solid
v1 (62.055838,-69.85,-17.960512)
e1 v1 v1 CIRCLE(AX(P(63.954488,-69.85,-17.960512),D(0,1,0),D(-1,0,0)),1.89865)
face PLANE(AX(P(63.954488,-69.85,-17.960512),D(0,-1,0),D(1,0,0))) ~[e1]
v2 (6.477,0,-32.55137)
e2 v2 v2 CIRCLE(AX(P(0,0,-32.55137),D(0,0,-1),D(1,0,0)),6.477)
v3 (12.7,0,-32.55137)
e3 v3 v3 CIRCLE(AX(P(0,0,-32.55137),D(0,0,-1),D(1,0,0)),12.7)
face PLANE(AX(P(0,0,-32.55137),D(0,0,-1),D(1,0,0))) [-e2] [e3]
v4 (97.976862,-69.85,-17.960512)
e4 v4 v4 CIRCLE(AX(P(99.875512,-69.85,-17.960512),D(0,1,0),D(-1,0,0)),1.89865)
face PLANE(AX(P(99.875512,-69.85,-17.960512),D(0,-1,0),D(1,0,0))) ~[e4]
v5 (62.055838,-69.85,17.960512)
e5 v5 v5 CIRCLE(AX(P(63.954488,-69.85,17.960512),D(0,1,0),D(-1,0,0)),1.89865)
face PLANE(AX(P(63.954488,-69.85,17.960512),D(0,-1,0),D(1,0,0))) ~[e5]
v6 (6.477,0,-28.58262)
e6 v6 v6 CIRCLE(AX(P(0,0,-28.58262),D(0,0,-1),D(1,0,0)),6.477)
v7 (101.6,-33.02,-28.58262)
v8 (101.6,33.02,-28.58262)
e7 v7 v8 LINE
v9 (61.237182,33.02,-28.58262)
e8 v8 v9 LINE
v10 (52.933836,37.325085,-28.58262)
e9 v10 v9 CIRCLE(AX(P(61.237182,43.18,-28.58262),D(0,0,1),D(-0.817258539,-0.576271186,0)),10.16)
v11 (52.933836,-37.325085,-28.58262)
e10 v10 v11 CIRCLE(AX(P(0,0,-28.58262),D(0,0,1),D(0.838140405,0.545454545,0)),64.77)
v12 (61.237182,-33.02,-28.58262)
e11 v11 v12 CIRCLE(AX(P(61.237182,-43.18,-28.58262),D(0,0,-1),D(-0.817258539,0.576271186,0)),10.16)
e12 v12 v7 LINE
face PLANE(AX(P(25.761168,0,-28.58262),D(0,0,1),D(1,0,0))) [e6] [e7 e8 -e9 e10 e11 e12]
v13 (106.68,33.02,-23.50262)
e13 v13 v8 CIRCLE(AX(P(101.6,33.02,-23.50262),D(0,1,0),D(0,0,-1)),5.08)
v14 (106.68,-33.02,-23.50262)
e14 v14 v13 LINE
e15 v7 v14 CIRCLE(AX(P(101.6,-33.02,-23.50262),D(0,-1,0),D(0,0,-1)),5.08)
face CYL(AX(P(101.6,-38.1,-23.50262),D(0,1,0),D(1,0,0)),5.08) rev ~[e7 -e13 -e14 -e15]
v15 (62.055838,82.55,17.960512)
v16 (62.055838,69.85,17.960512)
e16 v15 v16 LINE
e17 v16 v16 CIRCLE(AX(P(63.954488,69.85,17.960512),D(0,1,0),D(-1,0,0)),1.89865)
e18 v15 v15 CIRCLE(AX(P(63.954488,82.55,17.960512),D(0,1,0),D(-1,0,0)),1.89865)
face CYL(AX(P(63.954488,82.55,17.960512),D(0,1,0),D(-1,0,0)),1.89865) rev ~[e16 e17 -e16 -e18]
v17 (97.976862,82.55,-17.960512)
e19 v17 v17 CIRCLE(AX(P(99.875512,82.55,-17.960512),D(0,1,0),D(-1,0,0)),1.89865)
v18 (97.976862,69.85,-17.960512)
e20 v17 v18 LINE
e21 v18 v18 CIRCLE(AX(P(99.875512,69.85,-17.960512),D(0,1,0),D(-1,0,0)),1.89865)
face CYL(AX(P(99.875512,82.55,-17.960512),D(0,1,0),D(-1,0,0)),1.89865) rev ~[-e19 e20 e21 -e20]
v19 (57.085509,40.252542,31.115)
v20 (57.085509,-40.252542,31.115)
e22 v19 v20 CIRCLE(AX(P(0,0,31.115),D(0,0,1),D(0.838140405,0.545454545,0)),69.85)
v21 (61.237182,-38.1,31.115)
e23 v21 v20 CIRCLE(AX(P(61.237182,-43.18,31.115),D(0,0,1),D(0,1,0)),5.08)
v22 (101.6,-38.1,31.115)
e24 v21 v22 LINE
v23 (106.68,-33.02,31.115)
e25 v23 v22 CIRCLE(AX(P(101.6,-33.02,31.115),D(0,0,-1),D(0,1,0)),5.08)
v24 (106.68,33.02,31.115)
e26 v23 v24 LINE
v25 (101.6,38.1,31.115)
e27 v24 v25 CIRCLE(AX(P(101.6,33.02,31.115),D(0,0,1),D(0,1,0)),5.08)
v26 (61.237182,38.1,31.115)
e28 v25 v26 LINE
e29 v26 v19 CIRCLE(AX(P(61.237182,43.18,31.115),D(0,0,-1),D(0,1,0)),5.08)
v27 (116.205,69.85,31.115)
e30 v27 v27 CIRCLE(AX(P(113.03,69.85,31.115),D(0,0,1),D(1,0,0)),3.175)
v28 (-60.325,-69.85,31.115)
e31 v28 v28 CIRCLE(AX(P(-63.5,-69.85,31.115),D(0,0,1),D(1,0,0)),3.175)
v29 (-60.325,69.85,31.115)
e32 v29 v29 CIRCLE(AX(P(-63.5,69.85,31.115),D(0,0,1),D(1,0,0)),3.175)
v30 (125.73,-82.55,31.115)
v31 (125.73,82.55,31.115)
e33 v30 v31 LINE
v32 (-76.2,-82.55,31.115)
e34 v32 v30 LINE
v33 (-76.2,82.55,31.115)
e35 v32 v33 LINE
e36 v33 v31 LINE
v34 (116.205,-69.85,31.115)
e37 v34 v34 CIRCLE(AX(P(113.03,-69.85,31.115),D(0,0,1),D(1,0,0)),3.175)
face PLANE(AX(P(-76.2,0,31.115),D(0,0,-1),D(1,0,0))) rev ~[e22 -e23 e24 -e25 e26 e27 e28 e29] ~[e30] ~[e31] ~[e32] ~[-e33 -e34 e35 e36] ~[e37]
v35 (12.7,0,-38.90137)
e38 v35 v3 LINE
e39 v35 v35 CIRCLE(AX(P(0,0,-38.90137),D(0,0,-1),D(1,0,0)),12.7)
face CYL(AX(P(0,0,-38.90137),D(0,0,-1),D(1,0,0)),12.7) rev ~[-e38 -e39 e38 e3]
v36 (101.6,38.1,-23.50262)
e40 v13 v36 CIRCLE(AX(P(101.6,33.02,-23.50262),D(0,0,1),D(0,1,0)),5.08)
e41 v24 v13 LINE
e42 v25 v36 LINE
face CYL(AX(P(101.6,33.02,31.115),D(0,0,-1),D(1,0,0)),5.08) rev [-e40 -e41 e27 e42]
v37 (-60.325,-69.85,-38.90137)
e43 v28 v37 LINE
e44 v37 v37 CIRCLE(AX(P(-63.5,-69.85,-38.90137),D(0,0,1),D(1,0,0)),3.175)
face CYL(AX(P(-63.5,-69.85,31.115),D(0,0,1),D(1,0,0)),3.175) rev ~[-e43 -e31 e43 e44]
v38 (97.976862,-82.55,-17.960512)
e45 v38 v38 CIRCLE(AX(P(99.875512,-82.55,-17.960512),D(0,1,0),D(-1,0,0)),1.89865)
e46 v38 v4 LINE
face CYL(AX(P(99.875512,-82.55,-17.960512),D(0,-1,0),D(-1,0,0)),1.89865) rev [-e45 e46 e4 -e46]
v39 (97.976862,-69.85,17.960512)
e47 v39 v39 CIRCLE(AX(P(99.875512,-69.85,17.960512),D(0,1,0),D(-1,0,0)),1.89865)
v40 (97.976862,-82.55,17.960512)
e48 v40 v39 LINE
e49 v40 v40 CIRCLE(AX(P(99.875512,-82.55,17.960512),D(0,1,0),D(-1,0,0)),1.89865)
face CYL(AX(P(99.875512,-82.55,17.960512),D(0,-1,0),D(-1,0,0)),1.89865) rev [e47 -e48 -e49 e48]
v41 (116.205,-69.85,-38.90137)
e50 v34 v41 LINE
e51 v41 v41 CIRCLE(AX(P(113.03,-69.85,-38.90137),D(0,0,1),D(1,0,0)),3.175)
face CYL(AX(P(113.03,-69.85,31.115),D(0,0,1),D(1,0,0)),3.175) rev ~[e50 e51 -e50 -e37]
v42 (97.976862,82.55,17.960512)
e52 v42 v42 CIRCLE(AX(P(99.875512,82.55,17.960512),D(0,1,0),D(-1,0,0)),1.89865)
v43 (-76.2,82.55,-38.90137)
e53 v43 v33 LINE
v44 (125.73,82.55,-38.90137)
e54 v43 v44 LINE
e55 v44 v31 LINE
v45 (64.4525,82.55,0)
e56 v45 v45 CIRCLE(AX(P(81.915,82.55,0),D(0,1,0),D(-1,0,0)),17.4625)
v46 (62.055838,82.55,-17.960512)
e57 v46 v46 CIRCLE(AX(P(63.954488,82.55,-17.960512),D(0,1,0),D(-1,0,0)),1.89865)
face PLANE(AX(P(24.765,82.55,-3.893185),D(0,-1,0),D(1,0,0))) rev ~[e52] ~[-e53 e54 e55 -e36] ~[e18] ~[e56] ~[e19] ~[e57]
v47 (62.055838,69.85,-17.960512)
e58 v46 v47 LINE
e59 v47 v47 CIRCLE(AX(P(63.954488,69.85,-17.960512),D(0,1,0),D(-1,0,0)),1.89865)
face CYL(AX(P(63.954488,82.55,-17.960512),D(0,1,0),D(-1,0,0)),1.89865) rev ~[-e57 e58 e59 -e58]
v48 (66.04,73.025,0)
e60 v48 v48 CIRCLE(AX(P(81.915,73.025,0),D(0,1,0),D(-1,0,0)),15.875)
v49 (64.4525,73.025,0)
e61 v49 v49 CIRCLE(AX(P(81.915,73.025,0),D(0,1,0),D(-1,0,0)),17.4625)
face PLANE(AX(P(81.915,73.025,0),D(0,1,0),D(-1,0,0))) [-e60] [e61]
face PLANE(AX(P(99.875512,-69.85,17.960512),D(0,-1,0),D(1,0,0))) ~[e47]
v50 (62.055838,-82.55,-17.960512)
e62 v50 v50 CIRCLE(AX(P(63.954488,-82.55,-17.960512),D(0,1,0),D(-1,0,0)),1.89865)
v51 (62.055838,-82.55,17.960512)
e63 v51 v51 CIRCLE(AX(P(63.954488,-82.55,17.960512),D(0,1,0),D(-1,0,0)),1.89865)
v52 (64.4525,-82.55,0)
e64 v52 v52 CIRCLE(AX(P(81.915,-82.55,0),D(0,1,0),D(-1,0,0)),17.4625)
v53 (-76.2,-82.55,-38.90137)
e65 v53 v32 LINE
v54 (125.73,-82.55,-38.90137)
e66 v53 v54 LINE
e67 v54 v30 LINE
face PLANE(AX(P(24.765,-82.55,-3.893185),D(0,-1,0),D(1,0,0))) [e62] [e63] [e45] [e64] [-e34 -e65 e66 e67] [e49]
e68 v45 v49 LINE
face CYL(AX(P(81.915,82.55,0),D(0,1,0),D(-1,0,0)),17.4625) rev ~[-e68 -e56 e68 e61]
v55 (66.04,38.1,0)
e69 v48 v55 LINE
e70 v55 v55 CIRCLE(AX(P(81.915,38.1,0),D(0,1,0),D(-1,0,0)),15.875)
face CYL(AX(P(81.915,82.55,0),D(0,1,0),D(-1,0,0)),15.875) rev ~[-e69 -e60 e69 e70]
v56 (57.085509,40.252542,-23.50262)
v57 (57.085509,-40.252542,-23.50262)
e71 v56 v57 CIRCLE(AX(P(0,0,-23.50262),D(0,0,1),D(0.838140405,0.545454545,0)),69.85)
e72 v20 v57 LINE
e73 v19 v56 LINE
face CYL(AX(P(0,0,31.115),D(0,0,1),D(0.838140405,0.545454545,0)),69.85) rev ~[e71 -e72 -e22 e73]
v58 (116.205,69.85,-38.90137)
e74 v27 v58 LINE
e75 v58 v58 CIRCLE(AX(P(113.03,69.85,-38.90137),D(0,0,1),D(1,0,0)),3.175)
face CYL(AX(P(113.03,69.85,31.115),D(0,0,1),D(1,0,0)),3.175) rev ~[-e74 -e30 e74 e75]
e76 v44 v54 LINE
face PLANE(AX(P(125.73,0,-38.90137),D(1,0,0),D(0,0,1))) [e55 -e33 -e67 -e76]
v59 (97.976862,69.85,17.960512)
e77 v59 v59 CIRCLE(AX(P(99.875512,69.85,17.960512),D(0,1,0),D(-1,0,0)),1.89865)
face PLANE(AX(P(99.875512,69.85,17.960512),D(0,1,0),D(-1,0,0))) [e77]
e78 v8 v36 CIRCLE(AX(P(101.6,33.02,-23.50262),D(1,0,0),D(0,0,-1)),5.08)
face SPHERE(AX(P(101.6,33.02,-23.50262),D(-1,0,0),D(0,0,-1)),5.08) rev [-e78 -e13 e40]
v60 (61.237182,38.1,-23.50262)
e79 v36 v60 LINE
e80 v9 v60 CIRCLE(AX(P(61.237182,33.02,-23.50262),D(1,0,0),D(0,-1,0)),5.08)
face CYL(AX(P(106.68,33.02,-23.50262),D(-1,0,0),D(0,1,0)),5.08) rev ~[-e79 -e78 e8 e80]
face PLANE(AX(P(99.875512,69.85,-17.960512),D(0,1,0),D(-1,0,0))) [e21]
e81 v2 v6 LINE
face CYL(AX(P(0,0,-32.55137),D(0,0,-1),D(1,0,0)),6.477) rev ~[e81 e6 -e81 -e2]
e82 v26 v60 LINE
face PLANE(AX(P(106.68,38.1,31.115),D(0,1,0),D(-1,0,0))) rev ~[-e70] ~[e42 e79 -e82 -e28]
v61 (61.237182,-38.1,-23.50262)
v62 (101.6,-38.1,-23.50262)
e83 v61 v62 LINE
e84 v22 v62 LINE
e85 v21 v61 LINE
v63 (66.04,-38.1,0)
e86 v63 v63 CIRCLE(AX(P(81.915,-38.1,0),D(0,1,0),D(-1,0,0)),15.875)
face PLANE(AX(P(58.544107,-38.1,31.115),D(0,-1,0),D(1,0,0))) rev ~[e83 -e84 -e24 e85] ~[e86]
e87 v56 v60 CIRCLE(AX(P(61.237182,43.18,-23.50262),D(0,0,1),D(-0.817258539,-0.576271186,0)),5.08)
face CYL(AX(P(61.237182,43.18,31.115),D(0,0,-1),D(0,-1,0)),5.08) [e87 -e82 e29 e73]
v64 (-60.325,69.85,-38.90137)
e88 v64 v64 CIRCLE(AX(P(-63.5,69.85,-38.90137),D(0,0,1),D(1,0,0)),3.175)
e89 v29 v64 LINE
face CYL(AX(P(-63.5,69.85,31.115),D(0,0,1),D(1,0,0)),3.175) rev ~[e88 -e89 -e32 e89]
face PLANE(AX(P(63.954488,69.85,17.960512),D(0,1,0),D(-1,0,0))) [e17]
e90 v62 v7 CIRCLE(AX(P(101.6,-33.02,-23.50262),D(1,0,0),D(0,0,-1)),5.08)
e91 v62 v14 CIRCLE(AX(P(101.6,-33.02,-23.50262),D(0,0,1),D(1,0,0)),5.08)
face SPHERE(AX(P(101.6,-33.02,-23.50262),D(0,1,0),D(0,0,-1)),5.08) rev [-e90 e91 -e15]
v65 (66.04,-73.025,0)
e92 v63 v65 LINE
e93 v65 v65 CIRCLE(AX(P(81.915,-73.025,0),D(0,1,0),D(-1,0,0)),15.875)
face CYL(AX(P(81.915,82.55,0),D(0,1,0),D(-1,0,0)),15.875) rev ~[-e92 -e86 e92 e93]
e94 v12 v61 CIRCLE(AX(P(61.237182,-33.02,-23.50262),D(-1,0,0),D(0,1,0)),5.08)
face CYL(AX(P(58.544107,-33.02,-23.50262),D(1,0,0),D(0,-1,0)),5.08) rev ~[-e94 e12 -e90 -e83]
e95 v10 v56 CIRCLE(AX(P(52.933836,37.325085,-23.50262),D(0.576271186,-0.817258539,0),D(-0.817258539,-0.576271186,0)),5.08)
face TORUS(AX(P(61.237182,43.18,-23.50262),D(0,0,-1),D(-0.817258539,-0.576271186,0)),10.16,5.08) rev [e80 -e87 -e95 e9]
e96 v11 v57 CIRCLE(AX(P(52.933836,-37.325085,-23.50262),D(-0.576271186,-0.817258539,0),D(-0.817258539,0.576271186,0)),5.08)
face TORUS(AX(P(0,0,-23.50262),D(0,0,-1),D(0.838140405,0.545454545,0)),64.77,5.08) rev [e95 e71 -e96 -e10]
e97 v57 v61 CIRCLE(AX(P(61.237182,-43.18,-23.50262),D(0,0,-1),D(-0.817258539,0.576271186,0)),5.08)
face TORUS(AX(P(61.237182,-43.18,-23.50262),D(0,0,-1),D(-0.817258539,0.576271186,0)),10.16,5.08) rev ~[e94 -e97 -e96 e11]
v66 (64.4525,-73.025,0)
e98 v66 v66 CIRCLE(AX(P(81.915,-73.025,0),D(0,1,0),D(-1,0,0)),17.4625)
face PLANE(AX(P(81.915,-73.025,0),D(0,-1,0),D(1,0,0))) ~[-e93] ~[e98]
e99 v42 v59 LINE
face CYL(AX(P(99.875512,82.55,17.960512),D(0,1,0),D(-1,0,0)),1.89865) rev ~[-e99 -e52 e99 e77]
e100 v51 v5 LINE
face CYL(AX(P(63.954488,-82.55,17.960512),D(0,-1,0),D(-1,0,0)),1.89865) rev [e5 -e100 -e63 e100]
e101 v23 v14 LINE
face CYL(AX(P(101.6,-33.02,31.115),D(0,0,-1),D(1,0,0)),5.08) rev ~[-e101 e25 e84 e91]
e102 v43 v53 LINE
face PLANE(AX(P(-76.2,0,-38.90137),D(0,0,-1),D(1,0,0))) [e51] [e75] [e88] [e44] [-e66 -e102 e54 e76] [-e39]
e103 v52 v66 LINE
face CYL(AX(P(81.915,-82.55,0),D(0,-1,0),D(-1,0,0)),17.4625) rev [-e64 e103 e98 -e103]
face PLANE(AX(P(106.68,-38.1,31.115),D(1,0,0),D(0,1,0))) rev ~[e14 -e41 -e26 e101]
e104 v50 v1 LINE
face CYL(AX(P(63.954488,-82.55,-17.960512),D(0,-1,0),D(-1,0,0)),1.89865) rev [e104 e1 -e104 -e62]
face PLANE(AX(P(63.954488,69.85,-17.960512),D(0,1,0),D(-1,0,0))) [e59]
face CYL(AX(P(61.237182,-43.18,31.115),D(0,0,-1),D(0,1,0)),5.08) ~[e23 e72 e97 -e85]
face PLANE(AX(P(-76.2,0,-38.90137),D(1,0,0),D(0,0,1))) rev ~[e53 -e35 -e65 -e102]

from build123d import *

# Parameters (mm, degrees)
F2_W      = 201.93
F2_H      = 70.01637
F3_DEPTH  = 82.55
F5_DEPTH  = 59.69762
F6_R      = 12.7
F7_DEPTH  = 6.35
F8_R      = 6.477
F9_DEPTH  = 25.4
F10_R     = 15.875
F11_DEPTH = 165.101
F12_R     = 3.175
F13_DEPTH = 70.01737
F15_R     = 1.89865
F16_DEPTH = 12.7
F14_R     = 17.4625
F17_DEPTH = 9.525
F18_R     = 5.08


# Not quite as in the source:
# - a pattern or mirror of a feature is missing from the dataset's text; its kind, count and spacing are read off the source's solid


with BuildPart() as f3:
    # F2 (on Front) → F3 (new body, symmetric)
    with BuildSketch(Plane.XZ):
        with Locations((24.765, -3.893185)):
            Rectangle(F2_W, F2_H)
    extrude(amount=F3_DEPTH, both=True)

    # F4 (on face) → F5 (cut)
    with BuildSketch(Plane.XY.offset(31.115)):
        with BuildLine():
            Line((106.68, 38.1), (58.5441073038, 38.1))
            ThreePointArc((58.5441073038, 38.1), (-69.85, 0), (58.5441073038, -38.1))
            Line((58.5441073038, -38.1), (106.68, -38.1))
            Line((106.68, -38.1), (106.68, 38.1))
        make_face()
    extrude(amount=-F5_DEPTH, mode=Mode.SUBTRACT)

    # F6 (on face) → F7 (cut)
    with BuildSketch(Plane(origin=(0, 0, -38.90137), x_dir=(1, 0, 0), z_dir=(0, 0, -1))):
        Circle(F6_R)
    extrude(amount=-F7_DEPTH, mode=Mode.SUBTRACT)

    # F8 (on face) → F9 (cut)
    with BuildSketch(Plane(origin=(0, 0, -32.55137), x_dir=(1, 0, 0), z_dir=(0, 0, -1))):
        Circle(F8_R)
    extrude(amount=-F9_DEPTH, mode=Mode.SUBTRACT)

    # F10 (on face) → F11 (cut, through all)
    with BuildSketch(Plane(origin=(0, 82.55, 0), x_dir=(-1, 0, 0), z_dir=(0, 1, 0))):
        with Locations((-81.915, 0)):
            Circle(F10_R)
    extrude(amount=-F11_DEPTH, mode=Mode.SUBTRACT)

    # F12 (on face) → F13 (cut, through all)
    with BuildSketch(Plane.XY.offset(31.115)):
        with Locations((-63.5, 69.85)):
            Circle(F12_R)
        with Locations((-63.5, -69.85)):
            Circle(F12_R)
        with Locations((113.03, 69.85)):
            Circle(F12_R)
        with Locations((113.03, -69.85)):
            Circle(F12_R)
    extrude(amount=-F13_DEPTH, mode=Mode.SUBTRACT)

    # F15 (on face) → F16 (cut)
    with BuildSketch(Plane(origin=(0, 82.55, 0), x_dir=(-1, 0, 0), z_dir=(0, 1, 0))):
        with Locations((-99.8755122421, 17.9605122421)):
            Circle(F15_R)
        with Locations((-99.8755122421, -17.9605122421)):
            Circle(F15_R)
        with Locations((-63.9544877579, -17.9605122421)):
            Circle(F15_R)
        with Locations((-63.9544877579, 17.9605122421)):
            Circle(F15_R)
    f16 = extrude(amount=-F16_DEPTH, mode=Mode.SUBTRACT)

    # F16_copies: F16 across plane
    add(f16.mirror(Plane(origin=(0, 0, 0), x_dir=(0, 0, -1), z_dir=(0, -1, 0))), mode=Mode.SUBTRACT)

    # F14 (on face) → F17 (cut)
    with BuildSketch(Plane(origin=(0, 82.55, 0), x_dir=(-1, 0, 0), z_dir=(0, 1, 0))):
        with Locations((-81.915, 0)):
            Circle(F14_R)
    f17 = extrude(amount=-F17_DEPTH, mode=Mode.SUBTRACT)

    # F17_copies: F17 across plane
    add(f17.mirror(Plane(origin=(0, 0, 0), x_dir=(0, 0, -1), z_dir=(0, -1, 0))), mode=Mode.SUBTRACT)

    # F18
    f18_edges = [f3.edges().sort_by_distance(p)[0] for p in [
        (-69.85, 0, -28.58262),
        (82.612054, 38.1, -28.58262),
        (106.68, 0, -28.58262),
        (82.612054, -38.1, -28.58262),
        (58.544107, 38.1, 1.26619),
        (58.544107, -38.1, 1.26619),
        (106.68, 38.1, 1.26619),
        (106.68, -38.1, 1.26619),
    ]]
    fillet(f18_edges, radius=F18_R)


solid = f3.part
